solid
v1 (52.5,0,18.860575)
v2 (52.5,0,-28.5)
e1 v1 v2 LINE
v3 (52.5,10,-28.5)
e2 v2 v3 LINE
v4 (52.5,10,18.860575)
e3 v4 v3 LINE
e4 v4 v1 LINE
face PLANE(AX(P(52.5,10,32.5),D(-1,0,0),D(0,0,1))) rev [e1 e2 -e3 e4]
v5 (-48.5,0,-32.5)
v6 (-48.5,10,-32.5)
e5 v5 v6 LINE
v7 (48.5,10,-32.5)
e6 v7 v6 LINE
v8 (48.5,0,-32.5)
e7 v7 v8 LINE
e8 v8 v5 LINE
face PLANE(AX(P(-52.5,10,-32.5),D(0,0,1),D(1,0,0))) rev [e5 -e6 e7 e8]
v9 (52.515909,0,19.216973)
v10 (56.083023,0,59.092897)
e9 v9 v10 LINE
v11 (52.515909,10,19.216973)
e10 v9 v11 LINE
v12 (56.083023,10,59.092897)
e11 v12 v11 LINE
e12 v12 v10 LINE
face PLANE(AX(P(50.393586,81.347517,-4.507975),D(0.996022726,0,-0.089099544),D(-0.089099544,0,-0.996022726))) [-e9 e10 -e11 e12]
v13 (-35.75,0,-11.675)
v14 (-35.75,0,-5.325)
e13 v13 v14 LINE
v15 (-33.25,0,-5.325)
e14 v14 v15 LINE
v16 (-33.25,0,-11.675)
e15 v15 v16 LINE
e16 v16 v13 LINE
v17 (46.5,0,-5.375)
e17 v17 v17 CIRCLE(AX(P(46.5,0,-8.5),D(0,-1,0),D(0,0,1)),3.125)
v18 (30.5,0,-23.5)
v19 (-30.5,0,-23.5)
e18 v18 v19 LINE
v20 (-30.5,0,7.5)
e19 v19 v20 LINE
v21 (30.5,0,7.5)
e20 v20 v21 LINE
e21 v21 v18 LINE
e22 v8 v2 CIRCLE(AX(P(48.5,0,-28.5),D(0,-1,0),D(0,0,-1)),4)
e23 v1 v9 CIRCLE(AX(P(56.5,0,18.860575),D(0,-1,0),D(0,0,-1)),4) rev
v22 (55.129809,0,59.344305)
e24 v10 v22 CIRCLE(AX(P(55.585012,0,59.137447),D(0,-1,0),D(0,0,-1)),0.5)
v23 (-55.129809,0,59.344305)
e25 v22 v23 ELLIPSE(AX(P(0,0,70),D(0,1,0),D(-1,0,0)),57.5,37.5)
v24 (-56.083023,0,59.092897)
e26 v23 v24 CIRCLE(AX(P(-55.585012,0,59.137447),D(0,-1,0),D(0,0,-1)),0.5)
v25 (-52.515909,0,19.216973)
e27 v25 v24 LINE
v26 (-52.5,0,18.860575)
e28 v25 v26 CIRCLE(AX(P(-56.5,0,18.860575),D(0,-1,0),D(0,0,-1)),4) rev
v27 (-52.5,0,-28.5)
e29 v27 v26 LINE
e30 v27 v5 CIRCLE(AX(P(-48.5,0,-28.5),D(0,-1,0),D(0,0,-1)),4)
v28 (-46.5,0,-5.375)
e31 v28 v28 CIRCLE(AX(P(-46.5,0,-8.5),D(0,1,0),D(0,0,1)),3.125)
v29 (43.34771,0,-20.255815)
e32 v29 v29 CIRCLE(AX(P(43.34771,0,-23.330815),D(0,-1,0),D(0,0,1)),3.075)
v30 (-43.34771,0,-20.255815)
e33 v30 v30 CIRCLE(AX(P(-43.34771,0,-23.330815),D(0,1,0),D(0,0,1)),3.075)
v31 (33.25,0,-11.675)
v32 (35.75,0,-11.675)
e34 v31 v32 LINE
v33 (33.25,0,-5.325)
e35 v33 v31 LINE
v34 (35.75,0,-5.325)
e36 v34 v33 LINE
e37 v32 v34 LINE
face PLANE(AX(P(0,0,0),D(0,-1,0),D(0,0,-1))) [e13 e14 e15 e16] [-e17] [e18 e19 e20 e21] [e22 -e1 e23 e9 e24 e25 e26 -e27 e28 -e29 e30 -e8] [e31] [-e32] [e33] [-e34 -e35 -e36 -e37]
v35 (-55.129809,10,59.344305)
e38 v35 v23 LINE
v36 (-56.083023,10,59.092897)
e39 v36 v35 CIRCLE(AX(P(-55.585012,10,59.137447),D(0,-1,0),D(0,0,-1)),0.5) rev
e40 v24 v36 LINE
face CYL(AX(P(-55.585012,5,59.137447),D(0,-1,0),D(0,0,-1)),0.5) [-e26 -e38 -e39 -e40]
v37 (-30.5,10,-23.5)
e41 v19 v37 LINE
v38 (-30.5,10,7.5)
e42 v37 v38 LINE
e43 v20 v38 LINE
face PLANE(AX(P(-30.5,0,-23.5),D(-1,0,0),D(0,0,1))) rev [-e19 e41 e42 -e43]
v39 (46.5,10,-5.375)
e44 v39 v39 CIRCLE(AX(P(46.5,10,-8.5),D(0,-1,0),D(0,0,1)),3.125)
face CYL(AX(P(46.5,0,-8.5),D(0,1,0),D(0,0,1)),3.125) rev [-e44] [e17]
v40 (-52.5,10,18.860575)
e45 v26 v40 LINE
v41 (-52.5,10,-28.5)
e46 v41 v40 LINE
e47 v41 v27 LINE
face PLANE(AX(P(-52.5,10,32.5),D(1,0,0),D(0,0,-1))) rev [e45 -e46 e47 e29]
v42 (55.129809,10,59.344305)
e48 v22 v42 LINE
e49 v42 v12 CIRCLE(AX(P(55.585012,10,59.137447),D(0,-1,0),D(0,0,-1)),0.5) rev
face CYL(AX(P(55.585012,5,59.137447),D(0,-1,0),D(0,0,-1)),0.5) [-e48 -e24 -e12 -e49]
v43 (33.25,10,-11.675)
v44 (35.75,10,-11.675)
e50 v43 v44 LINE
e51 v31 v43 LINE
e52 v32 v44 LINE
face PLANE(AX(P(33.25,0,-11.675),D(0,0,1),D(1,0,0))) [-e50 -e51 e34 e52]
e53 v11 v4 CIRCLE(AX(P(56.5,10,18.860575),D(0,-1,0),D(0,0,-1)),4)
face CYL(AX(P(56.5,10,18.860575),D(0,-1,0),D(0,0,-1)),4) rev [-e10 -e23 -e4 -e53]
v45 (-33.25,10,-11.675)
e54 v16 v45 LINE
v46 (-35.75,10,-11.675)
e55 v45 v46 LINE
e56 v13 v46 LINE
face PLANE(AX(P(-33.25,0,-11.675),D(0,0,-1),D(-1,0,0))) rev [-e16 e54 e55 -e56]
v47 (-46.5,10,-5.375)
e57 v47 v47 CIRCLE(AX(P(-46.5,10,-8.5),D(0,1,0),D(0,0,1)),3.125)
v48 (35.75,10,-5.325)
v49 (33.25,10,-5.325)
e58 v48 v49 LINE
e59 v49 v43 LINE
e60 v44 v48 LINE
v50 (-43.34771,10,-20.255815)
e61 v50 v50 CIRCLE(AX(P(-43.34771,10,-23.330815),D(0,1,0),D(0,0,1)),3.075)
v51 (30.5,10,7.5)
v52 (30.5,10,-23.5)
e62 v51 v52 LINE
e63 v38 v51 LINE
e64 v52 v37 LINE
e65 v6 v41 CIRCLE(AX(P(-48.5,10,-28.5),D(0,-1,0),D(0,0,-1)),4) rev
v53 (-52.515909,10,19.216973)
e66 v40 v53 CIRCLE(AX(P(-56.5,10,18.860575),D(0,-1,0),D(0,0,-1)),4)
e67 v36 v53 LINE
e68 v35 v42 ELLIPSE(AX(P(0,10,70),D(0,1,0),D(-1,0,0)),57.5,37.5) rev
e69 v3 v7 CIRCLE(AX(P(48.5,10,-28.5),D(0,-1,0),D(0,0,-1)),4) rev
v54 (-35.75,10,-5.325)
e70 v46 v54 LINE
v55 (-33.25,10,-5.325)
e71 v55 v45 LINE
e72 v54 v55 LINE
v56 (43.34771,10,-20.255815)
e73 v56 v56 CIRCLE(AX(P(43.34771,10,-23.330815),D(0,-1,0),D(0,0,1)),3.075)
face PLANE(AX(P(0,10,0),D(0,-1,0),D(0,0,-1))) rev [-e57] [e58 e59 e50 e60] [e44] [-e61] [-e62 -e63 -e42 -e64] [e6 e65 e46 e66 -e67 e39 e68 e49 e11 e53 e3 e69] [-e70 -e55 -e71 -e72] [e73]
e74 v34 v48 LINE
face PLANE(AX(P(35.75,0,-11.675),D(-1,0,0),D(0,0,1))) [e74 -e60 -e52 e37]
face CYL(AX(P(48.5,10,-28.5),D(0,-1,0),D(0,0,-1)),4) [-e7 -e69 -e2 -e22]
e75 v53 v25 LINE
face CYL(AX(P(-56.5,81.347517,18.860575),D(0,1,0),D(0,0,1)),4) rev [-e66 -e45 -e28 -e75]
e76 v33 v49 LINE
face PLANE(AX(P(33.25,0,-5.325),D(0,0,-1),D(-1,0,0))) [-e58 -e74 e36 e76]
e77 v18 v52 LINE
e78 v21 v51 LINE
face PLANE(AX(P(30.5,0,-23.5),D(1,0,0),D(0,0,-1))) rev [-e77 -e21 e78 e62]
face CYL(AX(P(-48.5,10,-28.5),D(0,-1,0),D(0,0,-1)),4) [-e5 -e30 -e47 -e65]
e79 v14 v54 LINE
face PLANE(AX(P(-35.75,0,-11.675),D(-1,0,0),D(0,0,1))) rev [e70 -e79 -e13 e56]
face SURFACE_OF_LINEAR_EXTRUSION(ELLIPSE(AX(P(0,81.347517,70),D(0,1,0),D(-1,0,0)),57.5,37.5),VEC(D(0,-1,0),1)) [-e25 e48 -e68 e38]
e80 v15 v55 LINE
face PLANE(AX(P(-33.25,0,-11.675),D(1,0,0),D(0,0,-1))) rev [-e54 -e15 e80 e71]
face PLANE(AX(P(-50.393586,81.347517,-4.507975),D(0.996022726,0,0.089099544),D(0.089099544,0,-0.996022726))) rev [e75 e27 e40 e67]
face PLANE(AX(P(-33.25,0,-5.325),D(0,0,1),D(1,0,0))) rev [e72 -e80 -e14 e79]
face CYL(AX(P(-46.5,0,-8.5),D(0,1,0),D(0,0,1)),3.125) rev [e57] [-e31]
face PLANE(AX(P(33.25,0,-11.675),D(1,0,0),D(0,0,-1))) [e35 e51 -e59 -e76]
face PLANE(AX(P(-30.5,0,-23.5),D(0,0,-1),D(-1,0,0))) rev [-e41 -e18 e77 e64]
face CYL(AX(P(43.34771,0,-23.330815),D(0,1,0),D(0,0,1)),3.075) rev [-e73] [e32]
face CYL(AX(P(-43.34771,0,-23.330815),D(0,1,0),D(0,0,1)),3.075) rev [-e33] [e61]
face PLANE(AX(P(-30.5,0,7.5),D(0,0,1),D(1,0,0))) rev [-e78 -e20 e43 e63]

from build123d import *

# Parameters (mm, degrees)
SKETCH1_W           = 105
SKETCH1_H           = 65
BOSS_EXTRUDE1_DEPTH = 10
SKETCH2_W           = 61
SKETCH2_H           = 31
CUT_EXTRUDE1_DEPTH  = 63.549980016
SKETCH4_R           = 3.125
SKETCH4_W           = 2.5
SKETCH4_H           = 6.35
CUT_EXTRUDE3_DEPTH  = 63.549980016
BOSS_EXTRUDE2_DEPTH = 10
SKETCH6_R           = 3.075
CUT_EXTRUDE4_DEPTH  = 85.949986617
FILLET1_R           = 4
FILLET2_R           = 0.5


with BuildPart() as part:
    # Sketch1 → Boss-Extrude1 (new body)
    with BuildSketch(Plane(origin=(0, 0, 0), x_dir=(1, 0, 0), z_dir=(0, 1, 0))):
        Rectangle(SKETCH1_W, SKETCH1_H)
    extrude(amount=BOSS_EXTRUDE1_DEPTH)

    # Sketch2 → Cut-Extrude1 (cut, through all)
    with BuildSketch(Plane(origin=(0, 10, 0), x_dir=(1, 0, 0), z_dir=(0, 1, 0))):
        with Locations((0, 8)):
            Rectangle(SKETCH2_W, SKETCH2_H)
    extrude(amount=-CUT_EXTRUDE1_DEPTH, mode=Mode.SUBTRACT)

    # Sketch4 → Cut-Extrude3 (cut, through all)
    with BuildSketch(Plane(origin=(0, 10, 0), x_dir=(1, 0, 0), z_dir=(0, 1, 0))):
        with Locations(Location((-46.5, 8.5, 0), (0, 0, 270))):
            Circle(SKETCH4_R)
        with Locations((-34.5, 8.5)):
            Rectangle(SKETCH4_W, SKETCH4_H)
    cut_extrude3 = extrude(amount=-CUT_EXTRUDE3_DEPTH, mode=Mode.SUBTRACT)

    # Sketch5 → Boss-Extrude2 (add)
    with BuildSketch(Plane(origin=(0, 0, 0), x_dir=(1, 0, 0), z_dir=(0, 1, 0))):
        with BuildLine():
            Line((0, -32.5), (-52.5, -19.039128985))
            Line((-52.5, -19.039128985), (-56.408079011, -62.726619731))
            add(Edge.make_bspline(
                [(0, -32.5), (-47.244656315, -32.5), (-56.408079011, -62.726619731)],
                knots=[4.71238898, 4.71238898, 4.71238898, 6.087991355, 6.087991355, 6.087991355], degree=2, weights=[1, 0.772643775, 1]))
        make_face()
    boss_extrude2 = extrude(amount=BOSS_EXTRUDE2_DEPTH)

    # Sketch6 → Cut-Extrude4 (cut, through all)
    with BuildSketch(Plane(origin=(0, 10, 0), x_dir=(1, 0, 0), z_dir=(0, 1, 0))):
        with Locations(Location((-43.347709835, 23.330814615, 0), (0, 0, 270))):
            Circle(SKETCH6_R)
    cut_extrude4 = extrude(amount=-CUT_EXTRUDE4_DEPTH, mode=Mode.SUBTRACT)

    # Mirror1: Cut-Extrude3, Boss-Extrude2, Cut-Extrude4 across plane
    add(cut_extrude3.mirror(Plane(origin=(0, 0, 0), x_dir=(0, 0, 1), z_dir=(1, 0, 0))), mode=Mode.SUBTRACT)
    add(boss_extrude2.mirror(Plane(origin=(0, 0, 0), x_dir=(0, 0, 1), z_dir=(1, 0, 0))))
    add(cut_extrude4.mirror(Plane(origin=(0, 0, 0), x_dir=(0, 0, 1), z_dir=(1, 0, 0))), mode=Mode.SUBTRACT)

    # Fillet1
    # the kernel refuses this fillet: 4 mm, written as the material it adds along each edge
    with BuildSketch(Plane(origin=(-52.5, 0, 19.039128985), x_dir=(0, 0, -1), z_dir=(0, 1, 0))) as fillet1_piece_1:
        with BuildLine():
            CenterArc((FILLET1_R * 0.0446385419256, FILLET1_R), FILLET1_R, 264.888193347, 5.111806653)
            Line((-FILLET1_R * 0.0444610022252, FILLET1_R * 0.00397727373713), (0, 0))
            Line((0, 0), (FILLET1_R * 0.0446385419256, 0))
        make_face()
    extrude(amount=10)
    with BuildSketch(Plane(origin=(52.5, 0, 19.039128985), x_dir=(0, 0, -1), z_dir=(0, 1, 0))) as fillet1_piece_2:
        with BuildLine():
            CenterArc((FILLET1_R * 0.0446385419256, -FILLET1_R), FILLET1_R, 90, 5.111806653)
            Line((-FILLET1_R * 0.0444610022252, -FILLET1_R * 0.00397727373713), (0, 0))
            Line((0, 0), (FILLET1_R * 0.0446385419256, 0))
        make_face()
    extrude(amount=10)
    # the kernel refuses this fillet: 4 mm, written as the material it takes off along each edge
    with BuildSketch(Plane(origin=(-52.5, -10, -32.5), x_dir=(0, 0, 1), z_dir=(0, 1, 0)), Plane(origin=(52.5, -10, -32.5), x_dir=(-1, 0, 0), z_dir=(0, 1, 0))) as fillet1_2_piece_1:
        with BuildLine():
            CenterArc((FILLET1_R, FILLET1_R), FILLET1_R, 180, 90)
            Line((0, FILLET1_R), (0, 0))
            Line((0, 0), (FILLET1_R, 0))
        make_face()
    extrude(amount=30, mode=Mode.SUBTRACT)

    # Fillet2
    fillet2_edges = [part.edges().sort_by_distance(p)[0] for p in [
        (56.408079011, 5, 62.726619731),
        (-56.408079011, 5, 62.726619731),
    ]]
    fillet(fillet2_edges, radius=FILLET2_R)


solid = part.part
